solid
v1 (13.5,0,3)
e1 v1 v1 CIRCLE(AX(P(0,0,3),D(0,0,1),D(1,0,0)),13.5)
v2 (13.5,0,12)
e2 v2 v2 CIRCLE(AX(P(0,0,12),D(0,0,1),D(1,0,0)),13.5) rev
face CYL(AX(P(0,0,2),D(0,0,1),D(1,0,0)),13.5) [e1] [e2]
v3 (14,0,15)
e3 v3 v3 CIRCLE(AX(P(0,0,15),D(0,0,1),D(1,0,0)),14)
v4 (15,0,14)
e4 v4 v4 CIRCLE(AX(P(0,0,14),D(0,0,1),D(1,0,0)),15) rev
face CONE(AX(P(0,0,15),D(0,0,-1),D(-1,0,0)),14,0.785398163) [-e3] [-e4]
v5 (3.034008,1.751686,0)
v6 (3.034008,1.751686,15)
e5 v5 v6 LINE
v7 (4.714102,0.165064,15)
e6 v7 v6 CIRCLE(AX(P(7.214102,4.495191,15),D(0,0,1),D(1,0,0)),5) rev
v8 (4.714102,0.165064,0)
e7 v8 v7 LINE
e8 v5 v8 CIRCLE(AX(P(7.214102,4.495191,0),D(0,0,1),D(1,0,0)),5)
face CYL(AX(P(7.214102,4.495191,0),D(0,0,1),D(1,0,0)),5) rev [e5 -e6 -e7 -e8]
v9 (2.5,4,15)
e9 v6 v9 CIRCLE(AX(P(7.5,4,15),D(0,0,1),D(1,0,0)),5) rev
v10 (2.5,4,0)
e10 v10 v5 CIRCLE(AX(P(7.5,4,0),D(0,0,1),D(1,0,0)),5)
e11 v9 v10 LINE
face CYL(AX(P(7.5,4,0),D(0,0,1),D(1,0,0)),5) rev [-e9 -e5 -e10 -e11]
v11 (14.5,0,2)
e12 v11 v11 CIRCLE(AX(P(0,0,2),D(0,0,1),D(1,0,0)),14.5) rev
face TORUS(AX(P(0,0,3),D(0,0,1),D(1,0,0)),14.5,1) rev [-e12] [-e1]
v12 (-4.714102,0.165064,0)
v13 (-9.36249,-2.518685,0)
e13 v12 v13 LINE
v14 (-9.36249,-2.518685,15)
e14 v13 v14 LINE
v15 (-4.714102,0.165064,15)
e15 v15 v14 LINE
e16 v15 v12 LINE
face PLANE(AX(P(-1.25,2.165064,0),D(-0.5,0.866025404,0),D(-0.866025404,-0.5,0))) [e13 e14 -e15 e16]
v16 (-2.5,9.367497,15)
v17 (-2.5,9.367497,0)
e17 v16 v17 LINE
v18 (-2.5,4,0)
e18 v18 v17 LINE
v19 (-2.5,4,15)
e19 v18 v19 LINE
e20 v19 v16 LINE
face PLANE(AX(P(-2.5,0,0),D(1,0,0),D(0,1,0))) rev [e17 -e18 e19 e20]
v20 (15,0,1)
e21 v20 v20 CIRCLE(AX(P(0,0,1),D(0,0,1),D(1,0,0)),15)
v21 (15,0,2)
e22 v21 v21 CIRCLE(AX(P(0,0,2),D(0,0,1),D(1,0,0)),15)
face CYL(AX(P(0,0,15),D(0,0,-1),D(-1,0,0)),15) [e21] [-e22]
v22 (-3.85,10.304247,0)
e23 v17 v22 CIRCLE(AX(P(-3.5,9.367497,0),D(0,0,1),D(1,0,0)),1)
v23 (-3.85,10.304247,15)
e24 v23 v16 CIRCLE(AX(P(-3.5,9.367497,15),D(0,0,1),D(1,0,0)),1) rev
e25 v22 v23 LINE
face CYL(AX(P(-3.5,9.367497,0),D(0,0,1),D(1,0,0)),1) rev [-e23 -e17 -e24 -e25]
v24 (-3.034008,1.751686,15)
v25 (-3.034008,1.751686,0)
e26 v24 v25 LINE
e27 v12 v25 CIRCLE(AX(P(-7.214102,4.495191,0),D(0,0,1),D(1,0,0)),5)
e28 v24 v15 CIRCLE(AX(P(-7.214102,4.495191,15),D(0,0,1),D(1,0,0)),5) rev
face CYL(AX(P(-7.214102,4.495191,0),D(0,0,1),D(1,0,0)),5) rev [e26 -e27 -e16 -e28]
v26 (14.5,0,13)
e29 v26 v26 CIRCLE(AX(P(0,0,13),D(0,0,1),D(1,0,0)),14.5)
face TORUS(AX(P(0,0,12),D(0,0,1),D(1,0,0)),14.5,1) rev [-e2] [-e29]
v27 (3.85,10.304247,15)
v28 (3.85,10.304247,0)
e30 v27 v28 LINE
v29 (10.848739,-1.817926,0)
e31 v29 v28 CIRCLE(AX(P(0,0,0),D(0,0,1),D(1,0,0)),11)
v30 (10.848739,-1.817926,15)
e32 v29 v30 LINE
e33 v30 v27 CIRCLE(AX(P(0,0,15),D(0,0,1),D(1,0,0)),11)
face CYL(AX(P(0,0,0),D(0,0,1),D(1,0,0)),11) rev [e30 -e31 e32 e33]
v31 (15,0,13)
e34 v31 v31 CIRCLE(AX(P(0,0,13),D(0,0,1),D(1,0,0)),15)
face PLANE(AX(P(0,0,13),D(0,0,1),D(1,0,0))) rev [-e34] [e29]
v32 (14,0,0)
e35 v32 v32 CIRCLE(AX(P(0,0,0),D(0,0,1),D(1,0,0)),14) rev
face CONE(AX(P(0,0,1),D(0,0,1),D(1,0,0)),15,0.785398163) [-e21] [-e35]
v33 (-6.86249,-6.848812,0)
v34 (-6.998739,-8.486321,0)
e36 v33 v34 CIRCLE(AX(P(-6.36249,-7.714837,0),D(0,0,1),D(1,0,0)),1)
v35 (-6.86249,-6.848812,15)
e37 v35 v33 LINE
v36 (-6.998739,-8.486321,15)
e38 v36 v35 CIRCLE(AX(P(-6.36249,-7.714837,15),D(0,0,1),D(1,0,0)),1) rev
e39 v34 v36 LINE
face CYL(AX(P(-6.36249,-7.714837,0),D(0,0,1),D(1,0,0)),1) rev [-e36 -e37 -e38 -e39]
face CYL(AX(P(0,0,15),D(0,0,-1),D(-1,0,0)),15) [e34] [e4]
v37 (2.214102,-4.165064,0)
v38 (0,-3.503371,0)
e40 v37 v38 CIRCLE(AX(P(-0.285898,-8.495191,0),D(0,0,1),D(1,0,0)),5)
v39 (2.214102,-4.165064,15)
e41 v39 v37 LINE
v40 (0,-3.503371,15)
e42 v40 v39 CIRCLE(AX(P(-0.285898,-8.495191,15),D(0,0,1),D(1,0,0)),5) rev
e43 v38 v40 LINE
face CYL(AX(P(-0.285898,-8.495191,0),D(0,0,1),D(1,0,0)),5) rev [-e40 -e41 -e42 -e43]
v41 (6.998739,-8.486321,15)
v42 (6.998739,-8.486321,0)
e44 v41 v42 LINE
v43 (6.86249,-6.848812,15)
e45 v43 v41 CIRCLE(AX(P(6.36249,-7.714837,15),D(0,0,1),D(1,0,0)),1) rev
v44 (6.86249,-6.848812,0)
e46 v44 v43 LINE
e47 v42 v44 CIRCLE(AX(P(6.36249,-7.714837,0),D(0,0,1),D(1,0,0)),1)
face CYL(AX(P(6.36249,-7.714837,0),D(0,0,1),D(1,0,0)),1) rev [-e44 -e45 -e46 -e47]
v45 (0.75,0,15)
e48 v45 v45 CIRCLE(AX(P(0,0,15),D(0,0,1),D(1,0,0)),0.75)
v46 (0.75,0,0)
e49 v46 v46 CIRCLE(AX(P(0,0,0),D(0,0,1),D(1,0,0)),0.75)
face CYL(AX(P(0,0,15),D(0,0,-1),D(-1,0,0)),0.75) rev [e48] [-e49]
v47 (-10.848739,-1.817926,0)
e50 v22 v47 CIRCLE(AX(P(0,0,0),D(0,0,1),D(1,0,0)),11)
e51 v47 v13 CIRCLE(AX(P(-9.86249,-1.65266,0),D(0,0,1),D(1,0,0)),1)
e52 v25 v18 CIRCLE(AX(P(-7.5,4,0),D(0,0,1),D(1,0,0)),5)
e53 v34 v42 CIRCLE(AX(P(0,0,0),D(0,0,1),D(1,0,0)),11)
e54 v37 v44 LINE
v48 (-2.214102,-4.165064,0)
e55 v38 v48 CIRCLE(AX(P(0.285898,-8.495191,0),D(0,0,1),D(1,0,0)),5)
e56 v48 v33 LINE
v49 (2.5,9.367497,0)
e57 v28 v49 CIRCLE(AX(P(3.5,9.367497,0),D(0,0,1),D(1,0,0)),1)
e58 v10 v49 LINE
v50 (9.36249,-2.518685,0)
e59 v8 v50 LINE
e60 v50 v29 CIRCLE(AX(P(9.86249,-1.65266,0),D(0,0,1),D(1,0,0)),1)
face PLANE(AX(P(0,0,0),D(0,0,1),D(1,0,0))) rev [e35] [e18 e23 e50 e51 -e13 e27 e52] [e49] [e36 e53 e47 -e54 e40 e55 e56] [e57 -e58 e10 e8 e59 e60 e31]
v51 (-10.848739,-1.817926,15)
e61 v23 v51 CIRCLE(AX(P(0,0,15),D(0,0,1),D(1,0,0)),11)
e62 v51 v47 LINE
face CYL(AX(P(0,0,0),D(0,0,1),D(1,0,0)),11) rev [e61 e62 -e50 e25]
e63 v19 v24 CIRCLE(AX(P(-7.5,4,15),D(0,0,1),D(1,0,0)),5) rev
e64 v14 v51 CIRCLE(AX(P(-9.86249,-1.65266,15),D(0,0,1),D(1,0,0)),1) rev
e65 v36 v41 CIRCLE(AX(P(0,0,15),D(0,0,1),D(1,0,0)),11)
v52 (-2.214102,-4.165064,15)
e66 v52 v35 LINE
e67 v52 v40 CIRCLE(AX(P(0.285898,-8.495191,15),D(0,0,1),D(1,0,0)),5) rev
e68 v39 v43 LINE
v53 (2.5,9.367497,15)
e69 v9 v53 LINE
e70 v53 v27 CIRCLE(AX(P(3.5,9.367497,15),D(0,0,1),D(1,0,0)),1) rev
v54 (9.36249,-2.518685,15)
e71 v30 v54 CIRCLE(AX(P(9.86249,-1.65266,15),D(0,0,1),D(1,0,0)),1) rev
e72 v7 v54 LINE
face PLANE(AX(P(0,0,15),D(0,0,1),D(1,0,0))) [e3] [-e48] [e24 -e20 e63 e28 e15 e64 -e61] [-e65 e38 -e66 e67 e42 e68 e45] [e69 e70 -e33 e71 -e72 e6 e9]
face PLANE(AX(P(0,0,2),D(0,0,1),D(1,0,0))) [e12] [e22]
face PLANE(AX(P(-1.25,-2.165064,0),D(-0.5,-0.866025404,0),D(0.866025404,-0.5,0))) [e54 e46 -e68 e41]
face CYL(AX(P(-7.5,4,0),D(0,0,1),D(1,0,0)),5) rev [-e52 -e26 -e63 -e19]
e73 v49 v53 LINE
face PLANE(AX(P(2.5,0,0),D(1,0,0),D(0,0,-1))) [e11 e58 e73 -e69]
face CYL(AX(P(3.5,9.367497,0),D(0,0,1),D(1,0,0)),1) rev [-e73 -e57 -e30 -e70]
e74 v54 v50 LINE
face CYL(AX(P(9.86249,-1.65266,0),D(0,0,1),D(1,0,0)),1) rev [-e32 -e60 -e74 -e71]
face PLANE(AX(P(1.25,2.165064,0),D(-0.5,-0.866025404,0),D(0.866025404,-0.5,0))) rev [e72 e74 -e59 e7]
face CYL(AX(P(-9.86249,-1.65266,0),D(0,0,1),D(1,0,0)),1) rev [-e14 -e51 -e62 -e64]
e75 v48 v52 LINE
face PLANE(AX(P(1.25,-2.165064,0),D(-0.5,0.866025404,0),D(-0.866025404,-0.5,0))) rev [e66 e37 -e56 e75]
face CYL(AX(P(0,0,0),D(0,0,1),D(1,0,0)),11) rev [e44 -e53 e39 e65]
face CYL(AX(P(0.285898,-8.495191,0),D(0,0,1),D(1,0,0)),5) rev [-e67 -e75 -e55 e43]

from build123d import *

# Parameters (mm, degrees)
SKETCH1_R           = 15
SKETCH1_R_2         = 0.75
BOSS_EXTRUDE1_DEPTH = 15
CUT_EXTRUDE1_START  = -11
SKETCH2_R           = 15
SKETCH2_R_2         = 13.5
CUT_EXTRUDE1_DEPTH  = 11
FILLET1_R           = 1
CUT_EXTRUDE2_DEPTH  = 26.980762114
FILLET2_R           = 5
FILLET3_R           = 1
CHAMFER2_SIZE       = 1


with BuildPart() as part:
    # Sketch1 → Boss-Extrude1 (new body)
    with BuildSketch(Plane.XY):
        Circle(SKETCH1_R)
        Circle(SKETCH1_R_2, mode=Mode.SUBTRACT)
    extrude(amount=BOSS_EXTRUDE1_DEPTH)

    # Sketch2 → Cut-Extrude1 (cut)
    with BuildSketch(Plane.XY.offset(13).offset(CUT_EXTRUDE1_START)):
        Circle(SKETCH2_R)
        Circle(SKETCH2_R_2, mode=Mode.SUBTRACT)
    extrude(amount=CUT_EXTRUDE1_DEPTH, mode=Mode.SUBTRACT)

    # Fillet1
    fillet1_edges = [part.edges().sort_by_distance(p)[0] for p in [
        (-13.5, 0, 2),
        (-13.5, 0, 13),
    ]]
    fillet(fillet1_edges, radius=FILLET1_R)

    # Sketch4 → Cut-Extrude2 (cut, through all)
    with BuildSketch(Plane.XY.offset(15)):
        with BuildLine():
            Line((2.5, 10.712142643), (2.5, 2.449489743))
            ThreePointArc((2.5, 2.449489743), (3.031088913, 1.75), (3.371320344, 0.940318638))
            Line((3.371320344, 0.940318638), (10.526987658, -3.191007812))
            ThreePointArc((10.526987658, -3.191007812), (10.881104361, -1.612937656), (11, 0))
            ThreePointArc((11, 0), (8.61684397, 6.837397166), (2.5, 10.712142643))
        make_face()
        with BuildLine():
            ThreePointArc((-8.026987658, -7.521134831), (0, -11), (8.026987658, -7.521134831))
            Line((8.026987658, -7.521134831), (0.871320344, -3.389808381))
            ThreePointArc((0.871320344, -3.389808381), (0, -3.5), (-0.871320344, -3.389808381))
            Line((-0.871320344, -3.389808381), (-8.026987658, -7.521134831))
        make_face()
        with BuildLine():
            ThreePointArc((-3.371320344, 0.940318638), (-3.031088913, 1.75), (-2.5, 2.449489743))
            Line((-2.5, 2.449489743), (-2.5, 10.712142643))
            ThreePointArc((-2.5, 10.712142643), (-9.526279442, 5.5), (-10.526987658, -3.191007812))
            Line((-10.526987658, -3.191007812), (-3.371320344, 0.940318638))
        make_face()
    extrude(amount=-CUT_EXTRUDE2_DEPTH, mode=Mode.SUBTRACT)

    # Fillet2
    # the kernel refuses this fillet: 5 mm, written as the material it adds along each edge
    with BuildSketch(Plane(origin=(-0.871320344, -3.389808381, 15), x_dir=(0.994067927349263, -0.108761003192966, 0), z_dir=(0, 0, -1)), Plane(origin=(3.371320344, 0.940318638, 15), x_dir=(-0.40284417196844124, 0.9152685797682891, 0), z_dir=(0, 0, -1)), Plane(origin=(-2.5, 2.449489743, 15), x_dir=(-0.5912237553808212, -0.8065075765753221, 0), z_dir=(0, 0, -1))) as fillet2_piece_1:
        with BuildLine():
            CenterArc((1.705620507, 4.94923638), FILLET2_R, 233.756102233, 28.072486936)
            Line((-1.25049827, 0.916698497), (0, 0))
            ThreePointArc((0, 0), (0.497472648, 0.035534534), (0.994945296, 0))
        make_face()
    extrude(amount=15)
    with BuildSketch(Plane(origin=(0.871320344, -3.389808381, 15), x_dir=(0.8660254037844362, -0.5000000000000042, 0), z_dir=(0, 0, -1)), Plane(origin=(2.5, 2.449489743, 15), x_dir=(0, 1, 0), z_dir=(0, 0, -1)), Plane(origin=(-3.371320344, 0.940318638, 15), x_dir=(-0.8660254037844451, -0.49999999999998884, 0), z_dir=(0, 0, -1))) as fillet2_piece_2:
        with BuildLine():
            CenterArc((1.550510257, 5), FILLET2_R, 241.927513064, 28.072486936)
            ThreePointArc((-0.802430919, 0.588235294), (-0.380206599, 0.322776518), (0, 0))
            Line((0, 0), (1.550510257, 0))
        make_face()
    extrude(amount=15)

    # Fillet3
    fillet3_edges = [part.edges().sort_by_distance(p)[0] for p in [
        (-2.5, 10.712142643, 7.5),
        (-10.526987658, -3.191007812, 7.5),
        (-8.026987658, -7.521134831, 7.5),
        (8.026987658, -7.521134831, 7.5),
        (10.526987658, -3.191007812, 7.5),
        (2.5, 10.712142643, 7.5),
    ]]
    fillet(fillet3_edges, radius=FILLET3_R)

    # Chamfer2
    chamfer2_edges = [part.edges().sort_by_distance(p)[0] for p in [
        (-15, 0, 0),
        (-15, 0, 15),
    ]]
    chamfer(chamfer2_edges, length=CHAMFER2_SIZE)


solid = part.part
